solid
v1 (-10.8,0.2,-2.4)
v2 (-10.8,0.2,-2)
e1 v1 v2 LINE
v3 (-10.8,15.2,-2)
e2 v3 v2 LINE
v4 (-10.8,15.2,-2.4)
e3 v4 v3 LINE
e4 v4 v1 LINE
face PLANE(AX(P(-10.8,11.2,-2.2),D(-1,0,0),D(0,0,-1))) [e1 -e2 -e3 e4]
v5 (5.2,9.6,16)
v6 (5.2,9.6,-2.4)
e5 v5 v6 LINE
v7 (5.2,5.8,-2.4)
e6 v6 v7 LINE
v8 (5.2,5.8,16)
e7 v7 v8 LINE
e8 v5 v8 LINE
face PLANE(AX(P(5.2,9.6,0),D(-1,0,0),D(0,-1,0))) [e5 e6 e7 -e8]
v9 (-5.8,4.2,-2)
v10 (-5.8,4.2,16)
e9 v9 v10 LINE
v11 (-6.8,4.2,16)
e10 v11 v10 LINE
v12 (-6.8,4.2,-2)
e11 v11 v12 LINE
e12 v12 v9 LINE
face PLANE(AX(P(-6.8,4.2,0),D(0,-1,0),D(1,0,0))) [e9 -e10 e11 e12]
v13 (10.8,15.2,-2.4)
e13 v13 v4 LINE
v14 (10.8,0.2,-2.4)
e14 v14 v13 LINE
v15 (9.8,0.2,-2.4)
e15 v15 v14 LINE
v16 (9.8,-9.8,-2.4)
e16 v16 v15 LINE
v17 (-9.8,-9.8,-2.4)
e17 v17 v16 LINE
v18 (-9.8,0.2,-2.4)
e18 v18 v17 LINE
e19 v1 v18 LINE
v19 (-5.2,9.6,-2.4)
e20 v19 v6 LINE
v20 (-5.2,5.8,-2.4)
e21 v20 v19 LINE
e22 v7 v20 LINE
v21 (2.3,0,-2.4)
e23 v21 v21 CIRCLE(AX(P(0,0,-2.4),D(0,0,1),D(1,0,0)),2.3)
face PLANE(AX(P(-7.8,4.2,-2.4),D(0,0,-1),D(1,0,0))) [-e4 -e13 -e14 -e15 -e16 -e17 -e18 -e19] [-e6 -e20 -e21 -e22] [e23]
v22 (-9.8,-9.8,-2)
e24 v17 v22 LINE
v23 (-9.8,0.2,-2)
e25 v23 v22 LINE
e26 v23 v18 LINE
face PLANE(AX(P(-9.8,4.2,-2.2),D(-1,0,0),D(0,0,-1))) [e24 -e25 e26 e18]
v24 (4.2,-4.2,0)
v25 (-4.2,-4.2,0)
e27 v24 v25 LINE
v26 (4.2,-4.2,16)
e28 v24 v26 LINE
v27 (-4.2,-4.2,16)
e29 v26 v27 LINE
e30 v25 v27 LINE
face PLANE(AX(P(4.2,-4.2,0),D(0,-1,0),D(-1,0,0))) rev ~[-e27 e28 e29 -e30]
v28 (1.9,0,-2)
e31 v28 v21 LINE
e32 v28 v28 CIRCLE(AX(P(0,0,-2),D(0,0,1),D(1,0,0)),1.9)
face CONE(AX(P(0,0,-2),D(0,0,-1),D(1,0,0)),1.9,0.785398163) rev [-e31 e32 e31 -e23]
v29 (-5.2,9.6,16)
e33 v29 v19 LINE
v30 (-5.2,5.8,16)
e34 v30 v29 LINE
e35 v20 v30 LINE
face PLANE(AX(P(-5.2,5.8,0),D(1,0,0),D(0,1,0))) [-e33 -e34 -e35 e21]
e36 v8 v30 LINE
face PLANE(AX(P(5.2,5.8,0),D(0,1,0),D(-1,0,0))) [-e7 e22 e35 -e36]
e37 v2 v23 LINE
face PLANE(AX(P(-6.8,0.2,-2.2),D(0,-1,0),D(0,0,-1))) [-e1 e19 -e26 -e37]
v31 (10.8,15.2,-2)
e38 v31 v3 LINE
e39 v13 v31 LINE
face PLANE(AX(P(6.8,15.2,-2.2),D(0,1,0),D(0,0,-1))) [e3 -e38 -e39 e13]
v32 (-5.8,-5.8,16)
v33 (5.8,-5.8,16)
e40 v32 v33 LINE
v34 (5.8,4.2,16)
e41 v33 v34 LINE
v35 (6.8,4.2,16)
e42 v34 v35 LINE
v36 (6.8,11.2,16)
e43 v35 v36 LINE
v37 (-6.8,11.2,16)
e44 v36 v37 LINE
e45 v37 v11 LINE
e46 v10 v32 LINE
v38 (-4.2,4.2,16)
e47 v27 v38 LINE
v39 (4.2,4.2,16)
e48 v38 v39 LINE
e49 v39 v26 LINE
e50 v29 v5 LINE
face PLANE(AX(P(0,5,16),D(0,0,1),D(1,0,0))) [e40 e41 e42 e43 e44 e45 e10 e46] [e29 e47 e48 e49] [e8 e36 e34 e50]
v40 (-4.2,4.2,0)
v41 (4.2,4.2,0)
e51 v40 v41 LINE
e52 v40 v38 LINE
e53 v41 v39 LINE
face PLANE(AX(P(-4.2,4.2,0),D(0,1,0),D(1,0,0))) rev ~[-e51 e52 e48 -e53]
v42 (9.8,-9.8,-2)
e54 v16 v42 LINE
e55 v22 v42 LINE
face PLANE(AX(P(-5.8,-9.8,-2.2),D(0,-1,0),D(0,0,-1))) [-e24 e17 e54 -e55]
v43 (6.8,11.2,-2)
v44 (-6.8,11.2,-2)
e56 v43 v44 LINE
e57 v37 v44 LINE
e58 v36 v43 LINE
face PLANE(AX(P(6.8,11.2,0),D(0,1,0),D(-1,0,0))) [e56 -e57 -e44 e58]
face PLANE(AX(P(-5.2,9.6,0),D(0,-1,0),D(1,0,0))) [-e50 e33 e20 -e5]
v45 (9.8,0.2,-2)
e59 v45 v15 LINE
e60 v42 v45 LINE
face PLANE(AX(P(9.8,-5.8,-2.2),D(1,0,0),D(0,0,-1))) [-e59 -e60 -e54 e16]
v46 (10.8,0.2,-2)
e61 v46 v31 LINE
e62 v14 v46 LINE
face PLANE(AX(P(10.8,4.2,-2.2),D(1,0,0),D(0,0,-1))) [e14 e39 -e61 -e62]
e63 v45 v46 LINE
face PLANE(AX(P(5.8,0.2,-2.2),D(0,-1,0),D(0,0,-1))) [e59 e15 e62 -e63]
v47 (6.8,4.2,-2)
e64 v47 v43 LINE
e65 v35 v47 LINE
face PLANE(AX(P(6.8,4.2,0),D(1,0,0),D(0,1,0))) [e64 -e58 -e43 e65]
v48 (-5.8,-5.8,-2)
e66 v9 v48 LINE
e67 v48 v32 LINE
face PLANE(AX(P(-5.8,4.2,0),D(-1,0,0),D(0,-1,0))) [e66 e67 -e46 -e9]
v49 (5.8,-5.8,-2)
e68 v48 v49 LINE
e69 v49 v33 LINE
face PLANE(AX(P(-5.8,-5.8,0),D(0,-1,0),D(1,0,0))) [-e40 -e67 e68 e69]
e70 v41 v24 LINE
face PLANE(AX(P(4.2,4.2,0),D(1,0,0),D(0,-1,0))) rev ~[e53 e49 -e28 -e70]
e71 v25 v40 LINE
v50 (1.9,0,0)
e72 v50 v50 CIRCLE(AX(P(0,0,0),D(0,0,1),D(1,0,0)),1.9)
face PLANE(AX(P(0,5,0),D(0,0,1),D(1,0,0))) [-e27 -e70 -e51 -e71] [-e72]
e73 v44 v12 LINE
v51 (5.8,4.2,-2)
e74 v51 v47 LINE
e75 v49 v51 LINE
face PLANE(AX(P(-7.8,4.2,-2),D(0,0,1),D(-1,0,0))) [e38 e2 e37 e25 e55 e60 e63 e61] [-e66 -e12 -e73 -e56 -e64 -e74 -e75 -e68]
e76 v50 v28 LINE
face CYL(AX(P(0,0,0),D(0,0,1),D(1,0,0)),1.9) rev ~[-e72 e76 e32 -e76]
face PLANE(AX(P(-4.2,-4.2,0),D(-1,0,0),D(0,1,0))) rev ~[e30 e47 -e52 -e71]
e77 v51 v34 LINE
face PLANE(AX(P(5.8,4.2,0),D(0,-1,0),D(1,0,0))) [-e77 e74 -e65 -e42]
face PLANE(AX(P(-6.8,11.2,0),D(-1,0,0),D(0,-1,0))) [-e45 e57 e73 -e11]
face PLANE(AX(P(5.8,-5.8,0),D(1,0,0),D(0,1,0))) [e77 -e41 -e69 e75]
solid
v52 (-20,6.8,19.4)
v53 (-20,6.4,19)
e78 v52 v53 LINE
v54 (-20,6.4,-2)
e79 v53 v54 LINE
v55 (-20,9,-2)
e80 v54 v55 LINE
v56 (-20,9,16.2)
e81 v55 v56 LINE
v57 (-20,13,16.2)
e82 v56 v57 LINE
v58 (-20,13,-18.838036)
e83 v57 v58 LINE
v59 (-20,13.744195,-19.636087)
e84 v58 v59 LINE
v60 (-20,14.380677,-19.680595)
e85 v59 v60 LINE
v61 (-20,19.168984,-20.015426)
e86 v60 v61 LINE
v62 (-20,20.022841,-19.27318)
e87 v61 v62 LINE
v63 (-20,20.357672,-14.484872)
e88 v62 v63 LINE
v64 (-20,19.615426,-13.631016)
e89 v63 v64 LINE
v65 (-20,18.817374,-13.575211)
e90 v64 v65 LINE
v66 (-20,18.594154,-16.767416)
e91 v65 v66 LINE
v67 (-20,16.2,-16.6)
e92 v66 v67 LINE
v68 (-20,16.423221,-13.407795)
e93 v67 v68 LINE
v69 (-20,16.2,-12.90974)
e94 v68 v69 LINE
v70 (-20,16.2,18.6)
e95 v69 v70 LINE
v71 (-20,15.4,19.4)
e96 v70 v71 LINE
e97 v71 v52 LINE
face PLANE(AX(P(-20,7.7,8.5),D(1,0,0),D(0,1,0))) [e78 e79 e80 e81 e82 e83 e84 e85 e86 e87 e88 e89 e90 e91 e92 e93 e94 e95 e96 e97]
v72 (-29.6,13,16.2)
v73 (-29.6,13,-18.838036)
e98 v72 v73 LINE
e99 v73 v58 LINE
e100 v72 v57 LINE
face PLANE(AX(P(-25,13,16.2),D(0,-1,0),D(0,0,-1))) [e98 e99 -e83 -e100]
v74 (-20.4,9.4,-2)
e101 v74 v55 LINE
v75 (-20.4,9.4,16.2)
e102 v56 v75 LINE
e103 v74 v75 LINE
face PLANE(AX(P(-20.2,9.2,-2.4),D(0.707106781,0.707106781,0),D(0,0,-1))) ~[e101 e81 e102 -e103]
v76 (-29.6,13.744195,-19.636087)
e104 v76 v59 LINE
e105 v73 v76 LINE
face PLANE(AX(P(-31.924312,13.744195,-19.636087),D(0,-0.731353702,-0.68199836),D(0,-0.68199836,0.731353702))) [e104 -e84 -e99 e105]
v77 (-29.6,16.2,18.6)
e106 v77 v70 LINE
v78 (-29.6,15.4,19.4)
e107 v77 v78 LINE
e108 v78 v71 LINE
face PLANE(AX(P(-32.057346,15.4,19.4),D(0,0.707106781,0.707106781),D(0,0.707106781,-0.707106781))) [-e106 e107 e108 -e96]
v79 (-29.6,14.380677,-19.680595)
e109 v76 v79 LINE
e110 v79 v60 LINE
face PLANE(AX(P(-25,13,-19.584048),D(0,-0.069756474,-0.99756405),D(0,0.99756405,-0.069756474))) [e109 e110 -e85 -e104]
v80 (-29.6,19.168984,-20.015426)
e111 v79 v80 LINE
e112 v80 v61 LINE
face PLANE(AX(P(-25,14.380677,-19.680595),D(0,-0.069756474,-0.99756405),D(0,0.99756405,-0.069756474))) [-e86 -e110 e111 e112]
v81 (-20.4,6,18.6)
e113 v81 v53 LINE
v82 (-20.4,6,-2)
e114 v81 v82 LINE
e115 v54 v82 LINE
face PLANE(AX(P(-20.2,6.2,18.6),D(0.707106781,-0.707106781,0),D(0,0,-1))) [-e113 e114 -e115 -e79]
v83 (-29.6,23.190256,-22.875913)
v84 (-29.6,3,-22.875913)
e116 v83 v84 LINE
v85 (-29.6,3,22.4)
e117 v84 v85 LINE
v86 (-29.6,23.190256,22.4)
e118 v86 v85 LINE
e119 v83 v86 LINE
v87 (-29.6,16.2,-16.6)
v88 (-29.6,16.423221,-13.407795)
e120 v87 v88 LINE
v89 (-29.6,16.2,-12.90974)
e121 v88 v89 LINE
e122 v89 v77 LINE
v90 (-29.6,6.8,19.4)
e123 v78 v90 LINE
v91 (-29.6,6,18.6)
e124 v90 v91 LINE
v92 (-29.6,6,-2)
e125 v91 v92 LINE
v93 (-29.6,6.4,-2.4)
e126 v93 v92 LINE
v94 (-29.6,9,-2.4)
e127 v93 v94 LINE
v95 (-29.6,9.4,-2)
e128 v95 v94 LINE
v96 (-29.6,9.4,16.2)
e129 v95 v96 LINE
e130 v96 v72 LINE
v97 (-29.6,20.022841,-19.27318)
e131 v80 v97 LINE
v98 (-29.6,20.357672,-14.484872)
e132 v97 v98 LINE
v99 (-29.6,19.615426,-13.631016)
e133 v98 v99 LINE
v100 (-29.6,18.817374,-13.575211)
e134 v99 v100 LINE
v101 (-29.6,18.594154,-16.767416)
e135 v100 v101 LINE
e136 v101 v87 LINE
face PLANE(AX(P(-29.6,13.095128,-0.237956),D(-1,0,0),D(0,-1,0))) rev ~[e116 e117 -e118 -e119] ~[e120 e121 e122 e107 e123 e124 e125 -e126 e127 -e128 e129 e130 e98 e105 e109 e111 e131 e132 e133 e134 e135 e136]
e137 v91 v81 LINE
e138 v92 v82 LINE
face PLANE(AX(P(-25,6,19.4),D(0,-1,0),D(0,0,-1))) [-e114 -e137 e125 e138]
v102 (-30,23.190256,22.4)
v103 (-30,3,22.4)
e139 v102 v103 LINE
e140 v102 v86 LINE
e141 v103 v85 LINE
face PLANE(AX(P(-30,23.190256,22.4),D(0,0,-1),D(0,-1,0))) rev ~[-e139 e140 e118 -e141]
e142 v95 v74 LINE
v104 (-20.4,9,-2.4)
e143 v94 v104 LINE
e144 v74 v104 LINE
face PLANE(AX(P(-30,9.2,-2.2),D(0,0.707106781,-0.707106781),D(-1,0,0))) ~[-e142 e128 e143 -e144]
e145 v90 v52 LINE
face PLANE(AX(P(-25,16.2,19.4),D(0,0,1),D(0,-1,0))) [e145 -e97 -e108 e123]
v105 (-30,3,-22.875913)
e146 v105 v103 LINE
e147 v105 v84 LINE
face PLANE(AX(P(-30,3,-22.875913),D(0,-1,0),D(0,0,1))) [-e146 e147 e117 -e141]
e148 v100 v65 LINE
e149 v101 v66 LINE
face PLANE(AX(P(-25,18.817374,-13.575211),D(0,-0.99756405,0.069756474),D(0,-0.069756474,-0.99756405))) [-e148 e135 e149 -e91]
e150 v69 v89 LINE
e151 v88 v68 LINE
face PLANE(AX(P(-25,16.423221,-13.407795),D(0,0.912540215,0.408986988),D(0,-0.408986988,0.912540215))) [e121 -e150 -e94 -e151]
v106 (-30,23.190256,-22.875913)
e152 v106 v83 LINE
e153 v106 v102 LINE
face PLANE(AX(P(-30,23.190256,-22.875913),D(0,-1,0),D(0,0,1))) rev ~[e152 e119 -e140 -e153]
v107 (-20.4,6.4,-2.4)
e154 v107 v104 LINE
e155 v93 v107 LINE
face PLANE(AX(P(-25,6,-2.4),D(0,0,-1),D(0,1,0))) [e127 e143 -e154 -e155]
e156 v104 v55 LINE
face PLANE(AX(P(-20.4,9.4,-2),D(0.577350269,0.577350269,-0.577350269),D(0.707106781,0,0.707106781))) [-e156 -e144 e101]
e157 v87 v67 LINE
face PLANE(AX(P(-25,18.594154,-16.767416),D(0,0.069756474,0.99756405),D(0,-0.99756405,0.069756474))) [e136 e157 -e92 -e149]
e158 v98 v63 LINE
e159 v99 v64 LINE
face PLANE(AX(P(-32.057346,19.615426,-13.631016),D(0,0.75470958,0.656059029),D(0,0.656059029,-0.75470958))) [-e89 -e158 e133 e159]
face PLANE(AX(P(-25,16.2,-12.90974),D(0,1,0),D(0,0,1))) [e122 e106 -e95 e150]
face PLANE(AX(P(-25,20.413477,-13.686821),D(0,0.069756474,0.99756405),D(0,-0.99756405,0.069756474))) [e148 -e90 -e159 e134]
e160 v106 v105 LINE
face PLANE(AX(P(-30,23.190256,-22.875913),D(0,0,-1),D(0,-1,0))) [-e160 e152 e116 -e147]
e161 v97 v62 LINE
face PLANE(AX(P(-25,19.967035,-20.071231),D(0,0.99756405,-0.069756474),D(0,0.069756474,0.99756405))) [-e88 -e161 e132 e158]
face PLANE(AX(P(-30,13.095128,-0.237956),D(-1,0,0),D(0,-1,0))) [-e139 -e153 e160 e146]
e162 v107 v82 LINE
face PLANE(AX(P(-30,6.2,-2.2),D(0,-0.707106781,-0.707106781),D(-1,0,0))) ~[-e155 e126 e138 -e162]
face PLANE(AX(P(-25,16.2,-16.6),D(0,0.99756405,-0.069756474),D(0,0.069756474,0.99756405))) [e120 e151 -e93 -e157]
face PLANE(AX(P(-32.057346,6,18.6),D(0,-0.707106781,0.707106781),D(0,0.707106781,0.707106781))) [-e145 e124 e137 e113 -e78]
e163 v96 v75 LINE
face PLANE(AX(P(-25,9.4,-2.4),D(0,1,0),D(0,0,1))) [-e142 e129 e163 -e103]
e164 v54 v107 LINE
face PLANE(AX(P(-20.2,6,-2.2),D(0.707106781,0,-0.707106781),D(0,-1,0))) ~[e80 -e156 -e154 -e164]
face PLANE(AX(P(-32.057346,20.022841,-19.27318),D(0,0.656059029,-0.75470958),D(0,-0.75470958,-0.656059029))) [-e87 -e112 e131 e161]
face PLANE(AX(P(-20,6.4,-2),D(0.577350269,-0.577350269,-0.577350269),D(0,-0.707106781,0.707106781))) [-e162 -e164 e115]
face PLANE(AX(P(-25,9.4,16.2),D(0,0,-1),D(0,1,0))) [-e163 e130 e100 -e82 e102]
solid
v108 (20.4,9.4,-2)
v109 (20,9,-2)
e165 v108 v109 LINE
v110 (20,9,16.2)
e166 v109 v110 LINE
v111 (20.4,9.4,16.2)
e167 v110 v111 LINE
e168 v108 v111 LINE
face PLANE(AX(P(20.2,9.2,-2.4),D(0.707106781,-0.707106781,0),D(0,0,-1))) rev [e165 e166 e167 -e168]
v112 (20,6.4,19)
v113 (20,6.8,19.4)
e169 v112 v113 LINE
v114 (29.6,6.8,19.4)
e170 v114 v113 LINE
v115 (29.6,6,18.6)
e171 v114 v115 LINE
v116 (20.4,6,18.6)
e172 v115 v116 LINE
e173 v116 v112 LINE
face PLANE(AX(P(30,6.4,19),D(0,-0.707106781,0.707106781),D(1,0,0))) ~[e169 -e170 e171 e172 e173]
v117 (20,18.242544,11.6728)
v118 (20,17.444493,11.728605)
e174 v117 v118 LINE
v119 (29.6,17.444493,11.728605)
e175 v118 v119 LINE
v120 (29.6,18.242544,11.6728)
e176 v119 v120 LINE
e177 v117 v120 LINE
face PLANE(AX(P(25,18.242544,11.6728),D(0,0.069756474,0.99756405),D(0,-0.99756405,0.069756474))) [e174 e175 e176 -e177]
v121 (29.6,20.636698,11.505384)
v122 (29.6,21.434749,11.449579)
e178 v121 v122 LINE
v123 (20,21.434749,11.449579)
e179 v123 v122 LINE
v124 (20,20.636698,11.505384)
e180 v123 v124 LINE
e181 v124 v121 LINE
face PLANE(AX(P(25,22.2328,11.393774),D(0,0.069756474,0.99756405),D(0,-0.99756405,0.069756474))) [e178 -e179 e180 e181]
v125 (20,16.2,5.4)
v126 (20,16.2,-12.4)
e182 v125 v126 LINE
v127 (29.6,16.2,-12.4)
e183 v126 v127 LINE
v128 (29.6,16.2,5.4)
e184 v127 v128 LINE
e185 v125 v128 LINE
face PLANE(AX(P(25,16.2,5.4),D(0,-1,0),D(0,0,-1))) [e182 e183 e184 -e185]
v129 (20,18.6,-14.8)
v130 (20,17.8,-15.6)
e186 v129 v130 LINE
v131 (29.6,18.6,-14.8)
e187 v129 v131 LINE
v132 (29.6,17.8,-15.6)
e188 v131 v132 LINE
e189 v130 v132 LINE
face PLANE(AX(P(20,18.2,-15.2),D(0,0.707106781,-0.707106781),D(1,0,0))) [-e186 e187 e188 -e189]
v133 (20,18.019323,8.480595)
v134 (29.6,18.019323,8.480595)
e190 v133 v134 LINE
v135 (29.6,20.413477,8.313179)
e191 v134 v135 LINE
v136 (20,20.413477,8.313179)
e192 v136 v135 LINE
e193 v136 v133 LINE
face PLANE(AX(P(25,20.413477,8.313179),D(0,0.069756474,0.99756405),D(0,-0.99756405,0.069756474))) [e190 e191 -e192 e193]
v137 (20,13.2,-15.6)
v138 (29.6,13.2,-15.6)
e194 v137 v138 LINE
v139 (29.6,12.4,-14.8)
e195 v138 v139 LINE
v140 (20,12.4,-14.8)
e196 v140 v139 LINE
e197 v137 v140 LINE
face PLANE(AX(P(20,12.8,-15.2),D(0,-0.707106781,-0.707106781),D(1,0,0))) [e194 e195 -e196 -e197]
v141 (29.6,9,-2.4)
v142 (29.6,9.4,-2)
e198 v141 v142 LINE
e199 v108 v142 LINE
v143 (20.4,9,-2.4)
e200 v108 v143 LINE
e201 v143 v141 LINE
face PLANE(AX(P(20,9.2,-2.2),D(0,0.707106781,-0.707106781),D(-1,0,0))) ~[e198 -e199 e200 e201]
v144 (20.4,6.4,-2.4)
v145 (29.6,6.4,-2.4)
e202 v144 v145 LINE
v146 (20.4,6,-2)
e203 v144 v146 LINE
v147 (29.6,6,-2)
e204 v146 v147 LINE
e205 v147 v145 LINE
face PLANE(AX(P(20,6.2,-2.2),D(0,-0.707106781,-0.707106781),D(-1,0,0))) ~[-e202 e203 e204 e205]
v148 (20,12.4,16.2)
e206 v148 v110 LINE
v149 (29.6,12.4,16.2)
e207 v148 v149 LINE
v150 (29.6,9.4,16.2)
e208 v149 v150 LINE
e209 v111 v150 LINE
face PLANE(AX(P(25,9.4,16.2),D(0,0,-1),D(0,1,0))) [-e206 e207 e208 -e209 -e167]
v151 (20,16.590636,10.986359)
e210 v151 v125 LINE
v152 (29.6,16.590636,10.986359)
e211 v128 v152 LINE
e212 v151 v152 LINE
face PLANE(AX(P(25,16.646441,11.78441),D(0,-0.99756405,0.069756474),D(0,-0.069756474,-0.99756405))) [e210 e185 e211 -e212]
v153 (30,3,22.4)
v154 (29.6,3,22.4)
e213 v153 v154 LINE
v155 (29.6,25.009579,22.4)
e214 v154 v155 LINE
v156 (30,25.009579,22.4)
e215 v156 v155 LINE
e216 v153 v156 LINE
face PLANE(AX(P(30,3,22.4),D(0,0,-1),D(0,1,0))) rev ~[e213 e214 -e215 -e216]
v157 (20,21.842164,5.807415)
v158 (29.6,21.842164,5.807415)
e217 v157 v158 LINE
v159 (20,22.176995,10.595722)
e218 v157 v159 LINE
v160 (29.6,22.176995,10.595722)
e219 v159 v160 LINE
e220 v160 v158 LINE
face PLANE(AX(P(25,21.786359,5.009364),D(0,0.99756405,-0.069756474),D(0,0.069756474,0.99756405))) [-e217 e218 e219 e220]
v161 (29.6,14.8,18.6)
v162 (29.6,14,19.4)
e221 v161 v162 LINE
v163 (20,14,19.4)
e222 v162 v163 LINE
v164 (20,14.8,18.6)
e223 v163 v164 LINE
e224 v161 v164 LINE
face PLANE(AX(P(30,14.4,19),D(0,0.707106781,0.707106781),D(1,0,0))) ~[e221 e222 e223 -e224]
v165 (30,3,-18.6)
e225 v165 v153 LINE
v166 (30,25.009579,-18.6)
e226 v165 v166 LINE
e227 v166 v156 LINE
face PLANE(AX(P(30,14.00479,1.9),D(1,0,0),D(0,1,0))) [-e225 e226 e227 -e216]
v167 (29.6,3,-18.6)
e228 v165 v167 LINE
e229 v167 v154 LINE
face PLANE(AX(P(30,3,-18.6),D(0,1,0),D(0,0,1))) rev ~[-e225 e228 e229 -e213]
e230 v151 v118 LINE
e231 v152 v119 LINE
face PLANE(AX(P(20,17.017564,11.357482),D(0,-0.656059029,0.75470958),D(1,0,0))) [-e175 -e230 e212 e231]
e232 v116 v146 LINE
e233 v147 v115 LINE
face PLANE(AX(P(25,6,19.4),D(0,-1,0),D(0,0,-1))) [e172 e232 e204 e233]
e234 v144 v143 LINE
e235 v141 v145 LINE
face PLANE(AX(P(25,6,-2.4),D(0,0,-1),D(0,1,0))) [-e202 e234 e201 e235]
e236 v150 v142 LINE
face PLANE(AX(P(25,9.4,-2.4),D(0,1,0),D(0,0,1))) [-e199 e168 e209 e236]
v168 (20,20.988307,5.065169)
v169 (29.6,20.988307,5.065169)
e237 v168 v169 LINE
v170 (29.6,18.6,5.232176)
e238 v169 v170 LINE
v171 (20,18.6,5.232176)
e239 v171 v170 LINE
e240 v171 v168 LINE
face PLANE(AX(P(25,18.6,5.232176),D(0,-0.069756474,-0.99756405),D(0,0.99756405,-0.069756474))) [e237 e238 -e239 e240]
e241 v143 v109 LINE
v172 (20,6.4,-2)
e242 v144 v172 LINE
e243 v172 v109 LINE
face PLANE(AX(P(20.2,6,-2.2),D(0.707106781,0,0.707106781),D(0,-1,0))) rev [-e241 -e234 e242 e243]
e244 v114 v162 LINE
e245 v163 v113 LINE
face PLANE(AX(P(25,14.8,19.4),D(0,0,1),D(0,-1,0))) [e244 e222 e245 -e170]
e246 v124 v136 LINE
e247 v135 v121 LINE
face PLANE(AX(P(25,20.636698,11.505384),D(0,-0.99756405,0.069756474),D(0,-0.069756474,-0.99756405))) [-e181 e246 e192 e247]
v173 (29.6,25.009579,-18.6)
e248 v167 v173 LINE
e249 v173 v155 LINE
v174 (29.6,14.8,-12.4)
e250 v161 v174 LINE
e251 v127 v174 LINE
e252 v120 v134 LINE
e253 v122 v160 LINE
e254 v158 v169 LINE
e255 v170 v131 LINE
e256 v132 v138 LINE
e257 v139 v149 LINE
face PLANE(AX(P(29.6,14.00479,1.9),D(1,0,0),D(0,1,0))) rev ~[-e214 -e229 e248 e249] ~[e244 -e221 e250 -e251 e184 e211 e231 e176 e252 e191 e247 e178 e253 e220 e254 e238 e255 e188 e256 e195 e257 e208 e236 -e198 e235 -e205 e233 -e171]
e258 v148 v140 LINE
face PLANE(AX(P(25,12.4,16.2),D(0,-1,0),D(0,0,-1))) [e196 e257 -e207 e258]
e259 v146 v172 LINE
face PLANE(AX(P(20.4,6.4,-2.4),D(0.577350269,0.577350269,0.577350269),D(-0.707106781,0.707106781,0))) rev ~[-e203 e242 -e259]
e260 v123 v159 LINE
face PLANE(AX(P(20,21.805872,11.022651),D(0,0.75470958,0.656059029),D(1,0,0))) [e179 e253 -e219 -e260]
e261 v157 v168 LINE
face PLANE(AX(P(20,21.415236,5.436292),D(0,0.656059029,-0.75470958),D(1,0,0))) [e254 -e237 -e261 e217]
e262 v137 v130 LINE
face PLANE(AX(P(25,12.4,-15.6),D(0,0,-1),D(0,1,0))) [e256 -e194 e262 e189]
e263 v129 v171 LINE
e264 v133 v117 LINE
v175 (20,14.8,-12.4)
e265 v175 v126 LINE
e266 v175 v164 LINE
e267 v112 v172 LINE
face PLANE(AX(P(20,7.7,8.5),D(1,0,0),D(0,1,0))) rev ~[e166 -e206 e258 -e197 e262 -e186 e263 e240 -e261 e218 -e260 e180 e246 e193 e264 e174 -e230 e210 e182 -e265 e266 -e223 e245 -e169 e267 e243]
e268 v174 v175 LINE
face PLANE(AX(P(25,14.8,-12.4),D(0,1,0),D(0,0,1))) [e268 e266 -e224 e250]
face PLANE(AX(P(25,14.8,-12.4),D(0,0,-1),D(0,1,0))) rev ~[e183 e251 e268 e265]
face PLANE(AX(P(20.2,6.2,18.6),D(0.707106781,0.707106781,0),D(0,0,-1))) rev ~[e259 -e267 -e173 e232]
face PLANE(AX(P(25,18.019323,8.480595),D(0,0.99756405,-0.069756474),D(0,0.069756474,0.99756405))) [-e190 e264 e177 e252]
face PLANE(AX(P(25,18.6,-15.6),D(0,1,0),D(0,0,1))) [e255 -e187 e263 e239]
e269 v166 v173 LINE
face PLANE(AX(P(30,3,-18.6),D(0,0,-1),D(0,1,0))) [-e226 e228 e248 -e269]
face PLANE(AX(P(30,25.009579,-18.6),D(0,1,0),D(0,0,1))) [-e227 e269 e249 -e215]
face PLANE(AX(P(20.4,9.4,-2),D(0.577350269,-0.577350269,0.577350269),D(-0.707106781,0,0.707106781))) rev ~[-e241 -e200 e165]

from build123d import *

# Parameters (mm, degrees)
F1_DEPTH    = 16
F0_W        = 8.4
F0_H        = 8.4
F0_R        = 1.9
F2_DEPTH    = 2.4
F4_W        = 3.6
F4_H        = 3.2
F5_DEPTH    = 5
F6_T1_DEPTH = 14.1146927807
F6_T3_DEPTH = 13.8486241795
F8_W        = 3
F8_H        = 3.2
F8_W_2      = 1.4
F9_DEPTH    = 5
F10_SIZE    = 0.8
F12_SIZE    = 0.4
F12_2_SIZE  = 0.4
F13_SIZE    = 0.4
F14_W       = 4
F14_H       = 0.4
F16_W       = 20.190256201
F16_H       = 45.2759127293
F17_DEPTH   = 0.4
F18_W       = 22.0095793974
F18_H       = 41
F19_DEPTH   = 0.4


# Not quite as in the source:
# - a fillet or chamfer that OpenCascade refuses, or shapes differently, is made with other operations: its cross-section is extruded or revolved along the edge and cut away or added
# - a feature names something its author has since deleted; it is built from what else it names


with BuildPart() as f1:
    # F0 (on Top) → F1 (new body)
    with BuildSketch(Plane.XY):
        Polygon((-5.8, 4.2), (-4.2, 4.2), (4.2, 4.2), (5.8, 4.2), (5.8, 5.8), (5.2, 5.8), (-5.2, 5.8), (-5.8, 5.8), align=None)
        Polygon((-4.2, -4.2), (-4.2, 4.2), (-5.8, 4.2), (-5.8, -5.8), (5.8, -5.8), (5.8, 4.2), (4.2, 4.2), (4.2, -4.2), align=None)
        Polygon((-6.8, 4.2), (-5.8, 4.2), (-5.8, 5.8), (-5.2, 5.8), (-5.2, 9.6), (5.2, 9.6), (5.2, 5.8), (5.8, 5.8), (5.8, 4.2), (6.8, 4.2), (6.8, 11.2), (-6.8, 11.2), align=None)
    extrude(amount=F1_DEPTH)

    # F0 (on Top) → F2 (join)
    with BuildSketch(Plane.XY):
        Polygon((-5.8, 4.2), (-4.2, 4.2), (4.2, 4.2), (5.8, 4.2), (5.8, 5.8), (5.2, 5.8), (-5.2, 5.8), (-5.8, 5.8), align=None)
        Rectangle(F0_W, F0_H)
        Circle(F0_R, mode=Mode.SUBTRACT)
        Polygon((-6.8, 4.2), (-5.8, 4.2), (-5.8, 5.8), (-5.2, 5.8), (-5.2, 9.6), (5.2, 9.6), (5.2, 5.8), (5.8, 5.8), (5.8, 4.2), (6.8, 4.2), (6.8, 11.2), (-6.8, 11.2), align=None)
        Polygon((-4.2, -4.2), (-4.2, 4.2), (-5.8, 4.2), (-5.8, -5.8), (5.8, -5.8), (5.8, 4.2), (4.2, 4.2), (4.2, -4.2), align=None)
    extrude(amount=-F2_DEPTH)

    # F13
    f13_edges = [f1.edges().sort_by_distance(p)[0] for p in [
        (-1.9, 0, -2.4),
    ]]
    chamfer(f13_edges, length=F13_SIZE)

    # F15: sweep along a path in F15_path
    with BuildLine(Plane(origin=(-5.8, 4.2, -2.4), x_dir=(0, 1, 0), z_dir=(0, 0, 1))) as f15_path:
        Line((0, 0), (-10, 0))
        Line((-10, 0), (-10, -11.6))
        Line((-10, -11.6), (0, -11.6))
        Line((0, -11.6), (0, -12.6))
        Line((0, -12.6), (7, -12.6))
        Line((7, -12.6), (7, 1))
        Line((7, 1), (0, 1))
        Line((0, 1), (0, 0))
    # F14 (on Front) → F15 (sweep)
    with BuildSketch(Plane.XZ):
        with Locations((-7.8, -2.2)):
            Rectangle(F14_W, F14_H)
    sweep(path=f15_path.line, transition=Transition.RIGHT)


with BuildPart() as f5:
    # F4 (on offset) → F5 (new body, symmetric)
    with BuildSketch(Plane.YZ.offset(-25)):
        Polygon((6, 19.4), (6, -2.4), (9.4, -2.4), (9.4, 16.2), (9.4, 19.4), align=None)
        Polygon((13, 19.4), (13, 16.2), (13, -16.6), (14.5960929631, -16.6), (14.8271182356, -13.2961846812), (16.2, -13.3921859261), (16.2, -12.9097403669), (16.2, 19.4), align=None)
        with Locations((11.2, 17.8)):
            Rectangle(F4_W, F4_H)
        Polygon((14.8271182356, -13.2961846812), (14.5960929631, -16.6), (16.2, -16.6), (16.2, -13.3921859261), align=None)
        Polygon((16.2, -16.6), (14.5960929631, -16.6), (14.3806768036, -19.6805946028), (19.9670354851, -20.0712308558), (20.413476917, -13.6868209341), (18.8173744366, -13.5752105762), (18.5941537206, -16.767415537), align=None)
        Polygon((14.5960929631, -16.6), (13, -16.6), (14.3806768036, -19.6805946028), align=None)
        Polygon((16.2, -13.3921859261), (16.2, -16.6), (16.423220716, -13.4077950392), align=None)
        Polygon((16.423220716, -13.4077950392), (16.2, -12.9097403669), (16.2, -13.3921859261), align=None)
        Polygon((14.3806768036, -19.6805946028), (13, -16.6), (13, -19.5840482756), align=None)
    extrude(amount=F5_DEPTH, both=True)

    # F6: chamfer of 0.8 on 5 edges, made by hand

    # F6_s2 → F6_t1 (cut)
    with BuildSketch(Plane.YZ.offset(-32.0573463904)):
        Polygon((20.0228406641, -19.2731796156), (19.1689842449, -20.0154256768), (19.9670354851, -20.0712308558), align=None)
        Polygon((19.6154256768, -13.6310157551), (20.357671738, -14.4848721744), (20.413476917, -13.6868209341), align=None)
        Polygon((15.4, 19.4), (16.2, 18.6), (16.2, 19.4), align=None)
        Polygon((6, 18.6), (6.8, 19.4), (6, 19.4), align=None)
    extrude(amount=F6_T1_DEPTH, mode=Mode.SUBTRACT)

    # F6_s4 → F6_t3 (cut)
    with BuildSketch(Plane.YZ.offset(-31.9243120897)):
        Polygon((13.744194821, -19.6360874469), (13, -18.8380362067), (13, -19.5840482756), align=None)
    extrude(amount=F6_T3_DEPTH, mode=Mode.SUBTRACT)

    # F12
    f12_edges = [f5.edges().sort_by_distance(p)[0] for p in [
        (-25, 6, -2.4),
        (-20, 7.7, -2.4),
        (-25, 9.4, -2.4),
        (-20, 9.4, 6.9),
        (-20, 6, 8.1),
    ]]
    chamfer(f12_edges, length=F12_SIZE)

    # F16 (on face) → F17 (join)
    with BuildSketch(Plane(origin=(-30, 0, 0), x_dir=(0, -1, 0), z_dir=(-1, 0, 0))):
        with Locations((-13.0951281005, -0.2379563647)):
            Rectangle(F16_W, F16_H)
    extrude(amount=-F17_DEPTH)


with BuildPart() as f9:
    # F8 (on offset) → F9 (new body, symmetric)
    with BuildSketch(Plane.YZ.offset(25)):
        Polygon((9.4, 16.2), (9.4, 19.4), (6, 19.4), (6, -2.4), (9.4, -2.4), align=None)
        with Locations((10.9, 17.8)):
            Rectangle(F8_W, F8_H)
        Polygon((14.8, 19.4), (12.4, 19.4), (12.4, 16.2), (12.4, -15.6), (14.8, -15.6), (14.8, -12.4), align=None)
        with Locations((15.5, -14)):
            Rectangle(F8_W_2, F8_H)
        Polygon((16.2, 5.4), (16.2, -12.4), (16.2, -15.6), (18.6, -15.6), (18.6, 5.2321756513), align=None)
        Polygon((18.6, 5.4), (16.2, 5.4), (18.6, 5.2321756513), align=None)
        Polygon((16.646441432, 11.7844099217), (16.2, 5.4), (18.6, 5.4), (18.6, 5.2321756513), (21.7863586815, 5.009363747), (22.2328001134, 11.3937736687), (20.636697633, 11.5053840267), (20.413476917, 8.3131790659), (18.0193231964, 8.4805946028), (18.2425439124, 11.6727995637), align=None)
    extrude(amount=F9_DEPTH, both=True)

    # F10
    f10_edges = [f9.edges().sort_by_distance(p)[0] for p in [
        (25, 22.2328, 11.393774),
        (25, 21.786359, 5.009364),
        (25, 16.646441, 11.78441),
        (25, 6, 19.4),
        (25, 14.8, 19.4),
        (25, 18.6, -15.6),
        (25, 12.4, -15.6),
    ]]
    chamfer(f10_edges, length=F10_SIZE)

    # F12#2
    f12_2_edges = [f9.edges().sort_by_distance(p)[0] for p in [
        (20, 6, 8.1),
        (25, 6, -2.4),
        (20, 7.7, -2.4),
        (25, 9.4, -2.4),
        (20, 9.4, 6.9),
    ]]
    chamfer(f12_2_edges, length=F12_2_SIZE)

    # F18 (on face) → F19 (join)
    with BuildSketch(Plane.YZ.offset(30)):
        with Locations((14.0047896987, 1.9)):
            Rectangle(F18_W, F18_H)
    extrude(amount=-F19_DEPTH)


solid = Compound([f1.part, f5.part, f9.part])
